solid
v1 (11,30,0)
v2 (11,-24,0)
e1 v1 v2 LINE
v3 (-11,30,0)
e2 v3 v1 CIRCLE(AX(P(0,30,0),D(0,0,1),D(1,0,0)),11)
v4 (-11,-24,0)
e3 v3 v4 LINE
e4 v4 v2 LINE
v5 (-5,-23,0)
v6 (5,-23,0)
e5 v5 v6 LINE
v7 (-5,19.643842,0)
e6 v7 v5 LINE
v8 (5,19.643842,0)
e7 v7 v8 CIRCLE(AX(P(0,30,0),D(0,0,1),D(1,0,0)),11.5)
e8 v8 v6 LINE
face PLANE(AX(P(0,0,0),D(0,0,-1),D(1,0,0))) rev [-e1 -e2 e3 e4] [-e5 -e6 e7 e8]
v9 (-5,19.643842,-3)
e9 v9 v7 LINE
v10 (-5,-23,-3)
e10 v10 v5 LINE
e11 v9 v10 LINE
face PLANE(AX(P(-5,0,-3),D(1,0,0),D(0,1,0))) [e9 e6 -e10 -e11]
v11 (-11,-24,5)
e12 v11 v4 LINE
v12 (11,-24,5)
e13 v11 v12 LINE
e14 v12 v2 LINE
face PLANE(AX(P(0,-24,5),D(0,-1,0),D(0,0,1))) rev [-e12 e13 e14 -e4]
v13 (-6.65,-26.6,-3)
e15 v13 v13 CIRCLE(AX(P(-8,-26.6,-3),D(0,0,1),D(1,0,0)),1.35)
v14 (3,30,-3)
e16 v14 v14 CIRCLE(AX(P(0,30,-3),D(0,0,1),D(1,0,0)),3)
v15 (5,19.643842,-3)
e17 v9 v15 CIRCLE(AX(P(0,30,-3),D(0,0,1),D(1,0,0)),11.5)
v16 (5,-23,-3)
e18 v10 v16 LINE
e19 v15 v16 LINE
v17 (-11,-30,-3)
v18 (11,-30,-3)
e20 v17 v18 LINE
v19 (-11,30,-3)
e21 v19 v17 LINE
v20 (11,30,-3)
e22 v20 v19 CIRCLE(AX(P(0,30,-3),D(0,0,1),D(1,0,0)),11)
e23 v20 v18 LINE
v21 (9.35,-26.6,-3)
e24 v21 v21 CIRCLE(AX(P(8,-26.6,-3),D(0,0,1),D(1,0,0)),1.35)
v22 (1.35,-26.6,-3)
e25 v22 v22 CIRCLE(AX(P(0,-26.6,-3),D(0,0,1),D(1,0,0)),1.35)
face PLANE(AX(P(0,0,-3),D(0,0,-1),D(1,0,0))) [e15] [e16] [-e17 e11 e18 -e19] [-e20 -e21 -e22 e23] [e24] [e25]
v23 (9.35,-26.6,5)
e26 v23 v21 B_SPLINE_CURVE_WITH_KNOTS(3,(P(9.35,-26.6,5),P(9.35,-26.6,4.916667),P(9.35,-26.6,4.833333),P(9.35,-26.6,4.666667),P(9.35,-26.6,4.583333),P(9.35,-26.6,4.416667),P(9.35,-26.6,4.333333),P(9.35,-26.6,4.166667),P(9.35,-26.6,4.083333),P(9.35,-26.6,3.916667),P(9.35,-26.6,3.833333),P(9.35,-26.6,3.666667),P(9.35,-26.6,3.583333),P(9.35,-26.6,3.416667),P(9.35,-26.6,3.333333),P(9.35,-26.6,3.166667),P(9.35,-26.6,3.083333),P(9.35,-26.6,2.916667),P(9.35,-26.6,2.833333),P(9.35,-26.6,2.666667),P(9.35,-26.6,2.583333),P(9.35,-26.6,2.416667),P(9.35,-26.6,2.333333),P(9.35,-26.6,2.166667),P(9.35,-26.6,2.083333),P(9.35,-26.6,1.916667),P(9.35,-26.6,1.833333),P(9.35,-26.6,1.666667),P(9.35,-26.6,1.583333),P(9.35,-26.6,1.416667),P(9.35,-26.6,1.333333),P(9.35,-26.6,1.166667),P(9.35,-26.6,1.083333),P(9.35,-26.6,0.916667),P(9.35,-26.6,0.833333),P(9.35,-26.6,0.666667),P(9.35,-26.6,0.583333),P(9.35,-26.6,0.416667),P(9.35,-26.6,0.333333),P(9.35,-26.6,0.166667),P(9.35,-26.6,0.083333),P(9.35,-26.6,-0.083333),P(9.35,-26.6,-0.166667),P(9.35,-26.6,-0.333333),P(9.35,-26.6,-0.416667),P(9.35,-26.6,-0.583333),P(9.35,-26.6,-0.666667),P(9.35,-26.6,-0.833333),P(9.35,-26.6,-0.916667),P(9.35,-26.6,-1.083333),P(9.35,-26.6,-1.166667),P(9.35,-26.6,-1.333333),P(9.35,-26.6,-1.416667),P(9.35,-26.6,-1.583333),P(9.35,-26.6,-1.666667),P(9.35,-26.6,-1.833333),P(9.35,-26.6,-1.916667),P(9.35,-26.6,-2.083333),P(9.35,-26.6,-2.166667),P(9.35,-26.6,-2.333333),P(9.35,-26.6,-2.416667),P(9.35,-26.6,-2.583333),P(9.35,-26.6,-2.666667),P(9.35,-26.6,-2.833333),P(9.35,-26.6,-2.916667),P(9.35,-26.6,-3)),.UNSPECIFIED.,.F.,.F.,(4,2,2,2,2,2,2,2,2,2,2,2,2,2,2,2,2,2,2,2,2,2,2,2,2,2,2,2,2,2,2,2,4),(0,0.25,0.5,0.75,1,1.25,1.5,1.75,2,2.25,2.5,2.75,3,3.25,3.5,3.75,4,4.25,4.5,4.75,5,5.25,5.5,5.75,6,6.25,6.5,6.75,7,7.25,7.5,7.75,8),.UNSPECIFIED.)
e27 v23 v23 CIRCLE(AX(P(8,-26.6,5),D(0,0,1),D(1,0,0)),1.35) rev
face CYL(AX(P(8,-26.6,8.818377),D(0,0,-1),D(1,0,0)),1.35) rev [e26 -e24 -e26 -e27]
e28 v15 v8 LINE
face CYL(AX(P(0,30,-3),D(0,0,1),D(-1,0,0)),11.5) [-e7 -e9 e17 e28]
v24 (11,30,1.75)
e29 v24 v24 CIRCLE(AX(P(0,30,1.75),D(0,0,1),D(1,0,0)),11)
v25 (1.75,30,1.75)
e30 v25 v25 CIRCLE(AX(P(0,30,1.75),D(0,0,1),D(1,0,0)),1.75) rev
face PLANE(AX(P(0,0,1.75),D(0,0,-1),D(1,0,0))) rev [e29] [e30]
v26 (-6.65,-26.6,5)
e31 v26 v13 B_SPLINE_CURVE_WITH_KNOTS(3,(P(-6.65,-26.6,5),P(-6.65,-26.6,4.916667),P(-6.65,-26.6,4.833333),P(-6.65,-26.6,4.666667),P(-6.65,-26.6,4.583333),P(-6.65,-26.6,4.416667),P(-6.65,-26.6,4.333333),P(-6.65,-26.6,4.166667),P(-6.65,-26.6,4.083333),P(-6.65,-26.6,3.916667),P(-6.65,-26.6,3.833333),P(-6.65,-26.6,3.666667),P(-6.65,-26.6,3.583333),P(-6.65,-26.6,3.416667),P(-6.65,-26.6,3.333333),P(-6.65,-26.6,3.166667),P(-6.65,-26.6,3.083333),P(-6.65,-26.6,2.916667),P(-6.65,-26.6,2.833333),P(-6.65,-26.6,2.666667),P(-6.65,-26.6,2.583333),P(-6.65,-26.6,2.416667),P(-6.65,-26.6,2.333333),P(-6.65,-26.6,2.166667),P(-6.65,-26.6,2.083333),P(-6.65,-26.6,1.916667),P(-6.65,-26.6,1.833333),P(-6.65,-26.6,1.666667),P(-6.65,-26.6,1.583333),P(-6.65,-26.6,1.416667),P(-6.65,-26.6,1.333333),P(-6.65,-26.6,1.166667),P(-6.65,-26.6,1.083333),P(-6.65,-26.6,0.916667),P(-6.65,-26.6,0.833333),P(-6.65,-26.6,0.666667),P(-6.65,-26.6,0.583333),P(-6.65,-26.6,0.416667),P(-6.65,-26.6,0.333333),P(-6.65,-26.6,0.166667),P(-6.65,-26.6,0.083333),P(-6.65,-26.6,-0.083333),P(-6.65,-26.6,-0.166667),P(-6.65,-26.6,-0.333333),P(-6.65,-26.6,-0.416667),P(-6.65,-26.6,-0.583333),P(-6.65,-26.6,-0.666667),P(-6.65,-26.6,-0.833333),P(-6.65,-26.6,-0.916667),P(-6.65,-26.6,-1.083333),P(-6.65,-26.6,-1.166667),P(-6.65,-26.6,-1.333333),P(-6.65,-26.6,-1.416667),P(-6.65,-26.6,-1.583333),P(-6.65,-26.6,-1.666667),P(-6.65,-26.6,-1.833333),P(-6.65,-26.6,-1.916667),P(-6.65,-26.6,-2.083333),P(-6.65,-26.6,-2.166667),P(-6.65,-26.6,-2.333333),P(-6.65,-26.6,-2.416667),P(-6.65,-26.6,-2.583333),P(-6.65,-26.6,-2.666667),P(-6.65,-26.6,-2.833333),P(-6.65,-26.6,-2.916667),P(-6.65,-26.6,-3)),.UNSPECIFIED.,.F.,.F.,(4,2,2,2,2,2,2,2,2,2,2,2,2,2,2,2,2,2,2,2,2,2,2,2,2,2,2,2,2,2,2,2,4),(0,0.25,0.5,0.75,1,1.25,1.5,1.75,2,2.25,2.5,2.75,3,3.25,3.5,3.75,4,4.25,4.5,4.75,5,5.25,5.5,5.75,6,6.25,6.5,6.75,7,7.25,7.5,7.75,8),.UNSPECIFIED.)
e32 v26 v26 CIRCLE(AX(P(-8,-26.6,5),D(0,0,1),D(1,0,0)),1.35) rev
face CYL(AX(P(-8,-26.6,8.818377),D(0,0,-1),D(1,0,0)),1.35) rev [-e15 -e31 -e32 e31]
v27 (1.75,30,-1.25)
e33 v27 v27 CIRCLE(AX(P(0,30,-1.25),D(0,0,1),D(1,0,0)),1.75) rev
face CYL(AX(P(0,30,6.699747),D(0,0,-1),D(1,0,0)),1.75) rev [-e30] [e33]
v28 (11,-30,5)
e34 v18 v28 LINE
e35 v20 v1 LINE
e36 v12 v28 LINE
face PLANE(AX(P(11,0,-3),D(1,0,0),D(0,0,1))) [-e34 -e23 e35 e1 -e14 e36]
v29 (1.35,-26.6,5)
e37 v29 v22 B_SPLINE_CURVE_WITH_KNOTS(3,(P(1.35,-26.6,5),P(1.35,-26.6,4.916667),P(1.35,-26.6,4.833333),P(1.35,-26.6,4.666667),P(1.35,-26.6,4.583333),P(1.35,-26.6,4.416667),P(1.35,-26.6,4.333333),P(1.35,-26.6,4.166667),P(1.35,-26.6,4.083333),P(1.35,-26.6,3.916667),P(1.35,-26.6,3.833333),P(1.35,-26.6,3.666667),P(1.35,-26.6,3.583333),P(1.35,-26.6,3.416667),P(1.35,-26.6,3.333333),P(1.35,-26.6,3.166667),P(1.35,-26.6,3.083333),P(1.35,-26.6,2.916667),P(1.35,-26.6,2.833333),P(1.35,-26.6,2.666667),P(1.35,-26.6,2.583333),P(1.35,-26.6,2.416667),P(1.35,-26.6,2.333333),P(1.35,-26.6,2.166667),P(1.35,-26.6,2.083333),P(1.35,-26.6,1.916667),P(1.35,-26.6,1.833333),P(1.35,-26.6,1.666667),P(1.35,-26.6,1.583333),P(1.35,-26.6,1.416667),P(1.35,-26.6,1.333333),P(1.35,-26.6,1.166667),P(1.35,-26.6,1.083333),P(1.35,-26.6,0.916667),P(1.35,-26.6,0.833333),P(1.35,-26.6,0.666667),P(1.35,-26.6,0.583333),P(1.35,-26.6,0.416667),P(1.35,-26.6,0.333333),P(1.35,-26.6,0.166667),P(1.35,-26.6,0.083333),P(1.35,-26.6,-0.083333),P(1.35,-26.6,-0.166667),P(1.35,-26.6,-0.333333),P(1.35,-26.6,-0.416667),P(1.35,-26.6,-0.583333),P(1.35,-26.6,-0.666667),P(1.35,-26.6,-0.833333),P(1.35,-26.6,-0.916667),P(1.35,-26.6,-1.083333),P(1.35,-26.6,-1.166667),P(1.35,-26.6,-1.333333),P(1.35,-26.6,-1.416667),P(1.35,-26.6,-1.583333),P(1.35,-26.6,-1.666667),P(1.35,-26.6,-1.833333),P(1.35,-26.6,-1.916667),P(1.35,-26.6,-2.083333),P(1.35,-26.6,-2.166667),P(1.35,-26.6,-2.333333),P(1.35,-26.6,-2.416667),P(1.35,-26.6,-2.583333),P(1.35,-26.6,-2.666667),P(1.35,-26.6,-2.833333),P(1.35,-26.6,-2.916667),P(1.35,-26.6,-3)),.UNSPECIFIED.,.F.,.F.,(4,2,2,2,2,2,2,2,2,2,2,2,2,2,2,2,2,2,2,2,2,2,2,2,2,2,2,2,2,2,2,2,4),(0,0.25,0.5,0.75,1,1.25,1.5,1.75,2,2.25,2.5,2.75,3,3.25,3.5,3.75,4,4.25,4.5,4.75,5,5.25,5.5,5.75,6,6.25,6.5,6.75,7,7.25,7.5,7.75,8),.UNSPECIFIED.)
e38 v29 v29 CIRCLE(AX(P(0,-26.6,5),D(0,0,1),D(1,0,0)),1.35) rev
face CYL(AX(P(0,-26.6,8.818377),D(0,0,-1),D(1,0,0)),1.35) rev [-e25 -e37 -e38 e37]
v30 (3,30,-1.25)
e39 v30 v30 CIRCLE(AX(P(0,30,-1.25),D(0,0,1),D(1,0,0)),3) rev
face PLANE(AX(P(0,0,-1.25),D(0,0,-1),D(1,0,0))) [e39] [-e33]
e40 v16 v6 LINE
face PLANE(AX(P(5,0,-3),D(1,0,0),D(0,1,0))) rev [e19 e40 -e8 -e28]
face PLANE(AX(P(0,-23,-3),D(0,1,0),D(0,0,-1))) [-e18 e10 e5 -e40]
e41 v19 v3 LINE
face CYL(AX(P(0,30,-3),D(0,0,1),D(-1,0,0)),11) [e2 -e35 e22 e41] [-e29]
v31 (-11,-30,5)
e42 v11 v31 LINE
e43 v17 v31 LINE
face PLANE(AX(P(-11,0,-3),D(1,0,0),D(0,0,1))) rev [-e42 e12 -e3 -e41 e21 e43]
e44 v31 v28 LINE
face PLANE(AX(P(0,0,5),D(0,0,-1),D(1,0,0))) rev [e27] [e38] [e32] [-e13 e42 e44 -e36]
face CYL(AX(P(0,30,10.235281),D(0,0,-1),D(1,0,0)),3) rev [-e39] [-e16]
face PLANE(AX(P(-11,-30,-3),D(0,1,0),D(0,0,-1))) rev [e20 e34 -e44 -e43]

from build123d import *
from build123d.topology import SkipClean

# Parameters (mm, degrees)
BOSS_EXTRUDE1_DEPTH           = 3
BOSS_EXTRUDE2_START           = -1.75
SKETCH1_3_R                   = 11
BOSS_EXTRUDE2_DEPTH           = 1.75
SKETCH2_R                     = 1.75
CUT_EXTRUDE1_DEPTH            = 4.75
SKETCH2_3_R                   = 3
CUT_EXTRUDE2_DEPTH            = 1.75
SKETCH1_6_W                   = 11
SKETCH1_6_H                   = 6
BOSS_EXTRUDE3_DEPTH           = 5
SKETCH3_R                     = 1.35
CUT_EXTRUDE3_DEPTH            = 8
LPATTERN1_COUNT               = 2
LPATTERN1_PITCH               = 8
LPATTERN1_COL_COUNT           = 2
LPATTERN1_COL_PITCH           = 8
BODY_MOVE_COPY1_START         = -3
BODY_MOVE_COPY1_OUTLINE_R     = 3
BODY_MOVE_COPY1_DEPTH         = 3
BODY_MOVE_COPY1_START_2       = 3
BODY_MOVE_COPY1_2_OUTLINE_W   = 22
BODY_MOVE_COPY1_2_OUTLINE_H   = 6
BODY_MOVE_COPY1_2_OUTLINE_R   = 1.35
BODY_MOVE_COPY1_2_DEPTH       = 2
BODY_MOVE_COPY1_START_3       = 1.25
BODY_MOVE_COPY1_3_OUTLINE_R   = 3
BODY_MOVE_COPY1_3_OUTLINE_R_2 = 1.75
BODY_MOVE_COPY1_3_DEPTH       = 0.5
BODY_MOVE_COPY1_4_DEPTH       = 3
BODY_MOVE_COPY1_START_4       = 1.75
BODY_MOVE_COPY1_5_OUTLINE_R   = 11
BODY_MOVE_COPY1_5_OUTLINE_R_2 = 3
BODY_MOVE_COPY1_5_DEPTH       = 1.25
BODY_MOVE_COPY1_START_5       = -5
BODY_MOVE_COPY1_6_OUTLINE_W   = 22
BODY_MOVE_COPY1_6_OUTLINE_H   = 6
BODY_MOVE_COPY1_6_OUTLINE_R   = 1.35
BODY_MOVE_COPY1_6_DEPTH       = 2
BODY_MOVE_COPY1_START_6       = -1.75
BODY_MOVE_COPY1_7_OUTLINE_R   = 3
BODY_MOVE_COPY1_7_OUTLINE_R_2 = 1.75
BODY_MOVE_COPY1_7_DEPTH       = 0.5


# Read off the part's stored shape, not the designer's step: Body-Move/Copy1
with BuildPart() as part:
    # Sketch1 → Boss-Extrude1 (new body)
    with BuildSketch(Plane.XY):
        with BuildLine():
            Line((-11, 30), (-11, -30))
            Line((-11, -30), (11, -30))
            Line((11, -30), (11, 30))
            ThreePointArc((11, 30), (0, 41), (-11, 30))
        make_face()
        with BuildLine():
            Line((5, -23), (-5, -23))
            Line((-5, -23), (-5, 19.643842411))
            ThreePointArc((-5, 19.643842411), (0, 18.5), (5, 19.643842411))
            Line((5, 19.643842411), (5, -23))
        make_face(mode=Mode.SUBTRACT)
    extrude(amount=BOSS_EXTRUDE1_DEPTH)

    # Sketch1<3> → Boss-Extrude2 (add)
    with BuildSketch(Plane.XY.offset(BOSS_EXTRUDE2_START)):
        with Locations((0, 30)):
            Circle(SKETCH1_3_R)
    extrude(amount=BOSS_EXTRUDE2_DEPTH)

    # Sketch2 → Cut-Extrude1 (cut)
    with BuildSketch(Plane.XY.offset(3)):
        with Locations((0, 30)):
            Circle(SKETCH2_R)
    extrude(amount=-CUT_EXTRUDE1_DEPTH, mode=Mode.SUBTRACT)

    # Sketch2<3> → Cut-Extrude2 (cut)
    with BuildSketch(Plane.XY.offset(3)):
        with Locations((0, 30)):
            Circle(SKETCH2_3_R)
    extrude(amount=-CUT_EXTRUDE2_DEPTH, mode=Mode.SUBTRACT)

    # Sketch1<6> → Boss-Extrude3 (add)
    with BuildSketch(Plane.XY):
        with Locations((5.5, -27)):
            Rectangle(SKETCH1_6_W, SKETCH1_6_H)
        with Locations((-5.5, -27)):
            Rectangle(SKETCH1_6_W, SKETCH1_6_H)
    extrude(amount=-BOSS_EXTRUDE3_DEPTH)

    # Sketch3 → Cut-Extrude3 (cut)
    with BuildSketch(Plane.XY.offset(3)):
        with Locations((0, -26.6)):
            Circle(SKETCH3_R)
    cut_extrude3 = extrude(amount=-CUT_EXTRUDE3_DEPTH, mode=Mode.SUBTRACT)

    # LPattern1: Cut-Extrude3 ×2
    with Locations(*[(i * LPATTERN1_PITCH, 0, 0) for i in range(1, LPATTERN1_COUNT)]):
        add(cut_extrude3, mode=Mode.SUBTRACT)

    # LPattern1 col: Cut-Extrude3 ×2
    with Locations(*[(-i * LPATTERN1_COL_PITCH, 0, 0) for i in range(1, LPATTERN1_COL_COUNT)]):
        add(cut_extrude3, mode=Mode.SUBTRACT)

    # Body-Move/Copy1 outline → Body-Move/Copy1 (add)
    with BuildSketch(Plane.XY.offset(BODY_MOVE_COPY1_START)):
        with BuildLine():
            Line((-11, 30), (-11, -24))
            Line((-11, -24), (11, -24))
            Line((11, -24), (11, 30))
            ThreePointArc((11, 30), (0, 41), (-11, 30))
        make_face()
        with BuildLine():
            Line((-5, -23), (-5, 19.643842411))
            ThreePointArc((-5, 19.643842411), (0, 18.5), (5, 19.643842411))
            Line((5, 19.643842411), (5, -23))
            Line((5, -23), (-5, -23))
        make_face(mode=Mode.SUBTRACT)
        with Locations((0, 30)):
            Circle(BODY_MOVE_COPY1_OUTLINE_R, mode=Mode.SUBTRACT)
    extrude(amount=BODY_MOVE_COPY1_DEPTH)

    # Body-Move_Copy1 2 outline → Body-Move_Copy1 2 (add)
    with BuildSketch(Plane.XY.offset(BODY_MOVE_COPY1_START_2)):
        with Locations((0, -27)):
            Rectangle(BODY_MOVE_COPY1_2_OUTLINE_W, BODY_MOVE_COPY1_2_OUTLINE_H)
        with Locations((-8, -26.6)):
            Circle(BODY_MOVE_COPY1_2_OUTLINE_R, mode=Mode.SUBTRACT)
        with Locations((0, -26.6)):
            Circle(BODY_MOVE_COPY1_2_OUTLINE_R, mode=Mode.SUBTRACT)
        with Locations((8, -26.6)):
            Circle(BODY_MOVE_COPY1_2_OUTLINE_R, mode=Mode.SUBTRACT)
    extrude(amount=BODY_MOVE_COPY1_2_DEPTH)

    # Body-Move_Copy1 3 outline → Body-Move_Copy1 3 (add)
    with BuildSketch(Plane.XY.offset(BODY_MOVE_COPY1_START_3)):
        with Locations((0, 30)):
            Circle(BODY_MOVE_COPY1_3_OUTLINE_R)
        with Locations((0, 30)):
            Circle(BODY_MOVE_COPY1_3_OUTLINE_R_2, mode=Mode.SUBTRACT)
    extrude(amount=BODY_MOVE_COPY1_3_DEPTH)

    # Body-Move_Copy1 4 outline → Body-Move_Copy1 4 (cut)
    with SkipClean():  # the faces are left unmerged after this step: merging them gives an invalid solid
        with BuildSketch(Plane.XY):
            with BuildLine():
                Line((-11, 30), (-11, -24))
                Line((-11, -24), (11, -24))
                Line((11, -24), (11, 30))
                ThreePointArc((11, 30), (0, 19), (-11, 30))
            make_face()
            with BuildLine():
                Line((-5, -23), (-5, 19.643842411))
                ThreePointArc((-5, 19.643842411), (0, 18.5), (5, 19.643842411))
                Line((5, 19.643842411), (5, -23))
                Line((5, -23), (-5, -23))
            make_face(mode=Mode.SUBTRACT)
        extrude(amount=BODY_MOVE_COPY1_4_DEPTH, mode=Mode.SUBTRACT)

    # Body-Move_Copy1 5 outline → Body-Move_Copy1 5 (cut)
    with BuildSketch(Plane.XY.offset(BODY_MOVE_COPY1_START_4)):
        with Locations((0, 30)):
            Circle(BODY_MOVE_COPY1_5_OUTLINE_R)
        with Locations((0, 30)):
            Circle(BODY_MOVE_COPY1_5_OUTLINE_R_2, mode=Mode.SUBTRACT)
    extrude(amount=BODY_MOVE_COPY1_5_DEPTH, mode=Mode.SUBTRACT)

    # Body-Move_Copy1 6 outline → Body-Move_Copy1 6 (cut)
    with BuildSketch(Plane.XY.offset(BODY_MOVE_COPY1_START_5)):
        with Locations((0, -27)):
            Rectangle(BODY_MOVE_COPY1_6_OUTLINE_W, BODY_MOVE_COPY1_6_OUTLINE_H)
        with Locations((-8, -26.6)):
            Circle(BODY_MOVE_COPY1_6_OUTLINE_R, mode=Mode.SUBTRACT)
        with Locations((0, -26.6)):
            Circle(BODY_MOVE_COPY1_6_OUTLINE_R, mode=Mode.SUBTRACT)
        with Locations((8, -26.6)):
            Circle(BODY_MOVE_COPY1_6_OUTLINE_R, mode=Mode.SUBTRACT)
    extrude(amount=BODY_MOVE_COPY1_6_DEPTH, mode=Mode.SUBTRACT)

    # Body-Move_Copy1 7 outline → Body-Move_Copy1 7 (cut)
    with BuildSketch(Plane.XY.offset(BODY_MOVE_COPY1_START_6)):
        with Locations((0, 30)):
            Circle(BODY_MOVE_COPY1_7_OUTLINE_R)
        with Locations((0, 30)):
            Circle(BODY_MOVE_COPY1_7_OUTLINE_R_2, mode=Mode.SUBTRACT)
    extrude(amount=BODY_MOVE_COPY1_7_DEPTH, mode=Mode.SUBTRACT)


solid = part.part
